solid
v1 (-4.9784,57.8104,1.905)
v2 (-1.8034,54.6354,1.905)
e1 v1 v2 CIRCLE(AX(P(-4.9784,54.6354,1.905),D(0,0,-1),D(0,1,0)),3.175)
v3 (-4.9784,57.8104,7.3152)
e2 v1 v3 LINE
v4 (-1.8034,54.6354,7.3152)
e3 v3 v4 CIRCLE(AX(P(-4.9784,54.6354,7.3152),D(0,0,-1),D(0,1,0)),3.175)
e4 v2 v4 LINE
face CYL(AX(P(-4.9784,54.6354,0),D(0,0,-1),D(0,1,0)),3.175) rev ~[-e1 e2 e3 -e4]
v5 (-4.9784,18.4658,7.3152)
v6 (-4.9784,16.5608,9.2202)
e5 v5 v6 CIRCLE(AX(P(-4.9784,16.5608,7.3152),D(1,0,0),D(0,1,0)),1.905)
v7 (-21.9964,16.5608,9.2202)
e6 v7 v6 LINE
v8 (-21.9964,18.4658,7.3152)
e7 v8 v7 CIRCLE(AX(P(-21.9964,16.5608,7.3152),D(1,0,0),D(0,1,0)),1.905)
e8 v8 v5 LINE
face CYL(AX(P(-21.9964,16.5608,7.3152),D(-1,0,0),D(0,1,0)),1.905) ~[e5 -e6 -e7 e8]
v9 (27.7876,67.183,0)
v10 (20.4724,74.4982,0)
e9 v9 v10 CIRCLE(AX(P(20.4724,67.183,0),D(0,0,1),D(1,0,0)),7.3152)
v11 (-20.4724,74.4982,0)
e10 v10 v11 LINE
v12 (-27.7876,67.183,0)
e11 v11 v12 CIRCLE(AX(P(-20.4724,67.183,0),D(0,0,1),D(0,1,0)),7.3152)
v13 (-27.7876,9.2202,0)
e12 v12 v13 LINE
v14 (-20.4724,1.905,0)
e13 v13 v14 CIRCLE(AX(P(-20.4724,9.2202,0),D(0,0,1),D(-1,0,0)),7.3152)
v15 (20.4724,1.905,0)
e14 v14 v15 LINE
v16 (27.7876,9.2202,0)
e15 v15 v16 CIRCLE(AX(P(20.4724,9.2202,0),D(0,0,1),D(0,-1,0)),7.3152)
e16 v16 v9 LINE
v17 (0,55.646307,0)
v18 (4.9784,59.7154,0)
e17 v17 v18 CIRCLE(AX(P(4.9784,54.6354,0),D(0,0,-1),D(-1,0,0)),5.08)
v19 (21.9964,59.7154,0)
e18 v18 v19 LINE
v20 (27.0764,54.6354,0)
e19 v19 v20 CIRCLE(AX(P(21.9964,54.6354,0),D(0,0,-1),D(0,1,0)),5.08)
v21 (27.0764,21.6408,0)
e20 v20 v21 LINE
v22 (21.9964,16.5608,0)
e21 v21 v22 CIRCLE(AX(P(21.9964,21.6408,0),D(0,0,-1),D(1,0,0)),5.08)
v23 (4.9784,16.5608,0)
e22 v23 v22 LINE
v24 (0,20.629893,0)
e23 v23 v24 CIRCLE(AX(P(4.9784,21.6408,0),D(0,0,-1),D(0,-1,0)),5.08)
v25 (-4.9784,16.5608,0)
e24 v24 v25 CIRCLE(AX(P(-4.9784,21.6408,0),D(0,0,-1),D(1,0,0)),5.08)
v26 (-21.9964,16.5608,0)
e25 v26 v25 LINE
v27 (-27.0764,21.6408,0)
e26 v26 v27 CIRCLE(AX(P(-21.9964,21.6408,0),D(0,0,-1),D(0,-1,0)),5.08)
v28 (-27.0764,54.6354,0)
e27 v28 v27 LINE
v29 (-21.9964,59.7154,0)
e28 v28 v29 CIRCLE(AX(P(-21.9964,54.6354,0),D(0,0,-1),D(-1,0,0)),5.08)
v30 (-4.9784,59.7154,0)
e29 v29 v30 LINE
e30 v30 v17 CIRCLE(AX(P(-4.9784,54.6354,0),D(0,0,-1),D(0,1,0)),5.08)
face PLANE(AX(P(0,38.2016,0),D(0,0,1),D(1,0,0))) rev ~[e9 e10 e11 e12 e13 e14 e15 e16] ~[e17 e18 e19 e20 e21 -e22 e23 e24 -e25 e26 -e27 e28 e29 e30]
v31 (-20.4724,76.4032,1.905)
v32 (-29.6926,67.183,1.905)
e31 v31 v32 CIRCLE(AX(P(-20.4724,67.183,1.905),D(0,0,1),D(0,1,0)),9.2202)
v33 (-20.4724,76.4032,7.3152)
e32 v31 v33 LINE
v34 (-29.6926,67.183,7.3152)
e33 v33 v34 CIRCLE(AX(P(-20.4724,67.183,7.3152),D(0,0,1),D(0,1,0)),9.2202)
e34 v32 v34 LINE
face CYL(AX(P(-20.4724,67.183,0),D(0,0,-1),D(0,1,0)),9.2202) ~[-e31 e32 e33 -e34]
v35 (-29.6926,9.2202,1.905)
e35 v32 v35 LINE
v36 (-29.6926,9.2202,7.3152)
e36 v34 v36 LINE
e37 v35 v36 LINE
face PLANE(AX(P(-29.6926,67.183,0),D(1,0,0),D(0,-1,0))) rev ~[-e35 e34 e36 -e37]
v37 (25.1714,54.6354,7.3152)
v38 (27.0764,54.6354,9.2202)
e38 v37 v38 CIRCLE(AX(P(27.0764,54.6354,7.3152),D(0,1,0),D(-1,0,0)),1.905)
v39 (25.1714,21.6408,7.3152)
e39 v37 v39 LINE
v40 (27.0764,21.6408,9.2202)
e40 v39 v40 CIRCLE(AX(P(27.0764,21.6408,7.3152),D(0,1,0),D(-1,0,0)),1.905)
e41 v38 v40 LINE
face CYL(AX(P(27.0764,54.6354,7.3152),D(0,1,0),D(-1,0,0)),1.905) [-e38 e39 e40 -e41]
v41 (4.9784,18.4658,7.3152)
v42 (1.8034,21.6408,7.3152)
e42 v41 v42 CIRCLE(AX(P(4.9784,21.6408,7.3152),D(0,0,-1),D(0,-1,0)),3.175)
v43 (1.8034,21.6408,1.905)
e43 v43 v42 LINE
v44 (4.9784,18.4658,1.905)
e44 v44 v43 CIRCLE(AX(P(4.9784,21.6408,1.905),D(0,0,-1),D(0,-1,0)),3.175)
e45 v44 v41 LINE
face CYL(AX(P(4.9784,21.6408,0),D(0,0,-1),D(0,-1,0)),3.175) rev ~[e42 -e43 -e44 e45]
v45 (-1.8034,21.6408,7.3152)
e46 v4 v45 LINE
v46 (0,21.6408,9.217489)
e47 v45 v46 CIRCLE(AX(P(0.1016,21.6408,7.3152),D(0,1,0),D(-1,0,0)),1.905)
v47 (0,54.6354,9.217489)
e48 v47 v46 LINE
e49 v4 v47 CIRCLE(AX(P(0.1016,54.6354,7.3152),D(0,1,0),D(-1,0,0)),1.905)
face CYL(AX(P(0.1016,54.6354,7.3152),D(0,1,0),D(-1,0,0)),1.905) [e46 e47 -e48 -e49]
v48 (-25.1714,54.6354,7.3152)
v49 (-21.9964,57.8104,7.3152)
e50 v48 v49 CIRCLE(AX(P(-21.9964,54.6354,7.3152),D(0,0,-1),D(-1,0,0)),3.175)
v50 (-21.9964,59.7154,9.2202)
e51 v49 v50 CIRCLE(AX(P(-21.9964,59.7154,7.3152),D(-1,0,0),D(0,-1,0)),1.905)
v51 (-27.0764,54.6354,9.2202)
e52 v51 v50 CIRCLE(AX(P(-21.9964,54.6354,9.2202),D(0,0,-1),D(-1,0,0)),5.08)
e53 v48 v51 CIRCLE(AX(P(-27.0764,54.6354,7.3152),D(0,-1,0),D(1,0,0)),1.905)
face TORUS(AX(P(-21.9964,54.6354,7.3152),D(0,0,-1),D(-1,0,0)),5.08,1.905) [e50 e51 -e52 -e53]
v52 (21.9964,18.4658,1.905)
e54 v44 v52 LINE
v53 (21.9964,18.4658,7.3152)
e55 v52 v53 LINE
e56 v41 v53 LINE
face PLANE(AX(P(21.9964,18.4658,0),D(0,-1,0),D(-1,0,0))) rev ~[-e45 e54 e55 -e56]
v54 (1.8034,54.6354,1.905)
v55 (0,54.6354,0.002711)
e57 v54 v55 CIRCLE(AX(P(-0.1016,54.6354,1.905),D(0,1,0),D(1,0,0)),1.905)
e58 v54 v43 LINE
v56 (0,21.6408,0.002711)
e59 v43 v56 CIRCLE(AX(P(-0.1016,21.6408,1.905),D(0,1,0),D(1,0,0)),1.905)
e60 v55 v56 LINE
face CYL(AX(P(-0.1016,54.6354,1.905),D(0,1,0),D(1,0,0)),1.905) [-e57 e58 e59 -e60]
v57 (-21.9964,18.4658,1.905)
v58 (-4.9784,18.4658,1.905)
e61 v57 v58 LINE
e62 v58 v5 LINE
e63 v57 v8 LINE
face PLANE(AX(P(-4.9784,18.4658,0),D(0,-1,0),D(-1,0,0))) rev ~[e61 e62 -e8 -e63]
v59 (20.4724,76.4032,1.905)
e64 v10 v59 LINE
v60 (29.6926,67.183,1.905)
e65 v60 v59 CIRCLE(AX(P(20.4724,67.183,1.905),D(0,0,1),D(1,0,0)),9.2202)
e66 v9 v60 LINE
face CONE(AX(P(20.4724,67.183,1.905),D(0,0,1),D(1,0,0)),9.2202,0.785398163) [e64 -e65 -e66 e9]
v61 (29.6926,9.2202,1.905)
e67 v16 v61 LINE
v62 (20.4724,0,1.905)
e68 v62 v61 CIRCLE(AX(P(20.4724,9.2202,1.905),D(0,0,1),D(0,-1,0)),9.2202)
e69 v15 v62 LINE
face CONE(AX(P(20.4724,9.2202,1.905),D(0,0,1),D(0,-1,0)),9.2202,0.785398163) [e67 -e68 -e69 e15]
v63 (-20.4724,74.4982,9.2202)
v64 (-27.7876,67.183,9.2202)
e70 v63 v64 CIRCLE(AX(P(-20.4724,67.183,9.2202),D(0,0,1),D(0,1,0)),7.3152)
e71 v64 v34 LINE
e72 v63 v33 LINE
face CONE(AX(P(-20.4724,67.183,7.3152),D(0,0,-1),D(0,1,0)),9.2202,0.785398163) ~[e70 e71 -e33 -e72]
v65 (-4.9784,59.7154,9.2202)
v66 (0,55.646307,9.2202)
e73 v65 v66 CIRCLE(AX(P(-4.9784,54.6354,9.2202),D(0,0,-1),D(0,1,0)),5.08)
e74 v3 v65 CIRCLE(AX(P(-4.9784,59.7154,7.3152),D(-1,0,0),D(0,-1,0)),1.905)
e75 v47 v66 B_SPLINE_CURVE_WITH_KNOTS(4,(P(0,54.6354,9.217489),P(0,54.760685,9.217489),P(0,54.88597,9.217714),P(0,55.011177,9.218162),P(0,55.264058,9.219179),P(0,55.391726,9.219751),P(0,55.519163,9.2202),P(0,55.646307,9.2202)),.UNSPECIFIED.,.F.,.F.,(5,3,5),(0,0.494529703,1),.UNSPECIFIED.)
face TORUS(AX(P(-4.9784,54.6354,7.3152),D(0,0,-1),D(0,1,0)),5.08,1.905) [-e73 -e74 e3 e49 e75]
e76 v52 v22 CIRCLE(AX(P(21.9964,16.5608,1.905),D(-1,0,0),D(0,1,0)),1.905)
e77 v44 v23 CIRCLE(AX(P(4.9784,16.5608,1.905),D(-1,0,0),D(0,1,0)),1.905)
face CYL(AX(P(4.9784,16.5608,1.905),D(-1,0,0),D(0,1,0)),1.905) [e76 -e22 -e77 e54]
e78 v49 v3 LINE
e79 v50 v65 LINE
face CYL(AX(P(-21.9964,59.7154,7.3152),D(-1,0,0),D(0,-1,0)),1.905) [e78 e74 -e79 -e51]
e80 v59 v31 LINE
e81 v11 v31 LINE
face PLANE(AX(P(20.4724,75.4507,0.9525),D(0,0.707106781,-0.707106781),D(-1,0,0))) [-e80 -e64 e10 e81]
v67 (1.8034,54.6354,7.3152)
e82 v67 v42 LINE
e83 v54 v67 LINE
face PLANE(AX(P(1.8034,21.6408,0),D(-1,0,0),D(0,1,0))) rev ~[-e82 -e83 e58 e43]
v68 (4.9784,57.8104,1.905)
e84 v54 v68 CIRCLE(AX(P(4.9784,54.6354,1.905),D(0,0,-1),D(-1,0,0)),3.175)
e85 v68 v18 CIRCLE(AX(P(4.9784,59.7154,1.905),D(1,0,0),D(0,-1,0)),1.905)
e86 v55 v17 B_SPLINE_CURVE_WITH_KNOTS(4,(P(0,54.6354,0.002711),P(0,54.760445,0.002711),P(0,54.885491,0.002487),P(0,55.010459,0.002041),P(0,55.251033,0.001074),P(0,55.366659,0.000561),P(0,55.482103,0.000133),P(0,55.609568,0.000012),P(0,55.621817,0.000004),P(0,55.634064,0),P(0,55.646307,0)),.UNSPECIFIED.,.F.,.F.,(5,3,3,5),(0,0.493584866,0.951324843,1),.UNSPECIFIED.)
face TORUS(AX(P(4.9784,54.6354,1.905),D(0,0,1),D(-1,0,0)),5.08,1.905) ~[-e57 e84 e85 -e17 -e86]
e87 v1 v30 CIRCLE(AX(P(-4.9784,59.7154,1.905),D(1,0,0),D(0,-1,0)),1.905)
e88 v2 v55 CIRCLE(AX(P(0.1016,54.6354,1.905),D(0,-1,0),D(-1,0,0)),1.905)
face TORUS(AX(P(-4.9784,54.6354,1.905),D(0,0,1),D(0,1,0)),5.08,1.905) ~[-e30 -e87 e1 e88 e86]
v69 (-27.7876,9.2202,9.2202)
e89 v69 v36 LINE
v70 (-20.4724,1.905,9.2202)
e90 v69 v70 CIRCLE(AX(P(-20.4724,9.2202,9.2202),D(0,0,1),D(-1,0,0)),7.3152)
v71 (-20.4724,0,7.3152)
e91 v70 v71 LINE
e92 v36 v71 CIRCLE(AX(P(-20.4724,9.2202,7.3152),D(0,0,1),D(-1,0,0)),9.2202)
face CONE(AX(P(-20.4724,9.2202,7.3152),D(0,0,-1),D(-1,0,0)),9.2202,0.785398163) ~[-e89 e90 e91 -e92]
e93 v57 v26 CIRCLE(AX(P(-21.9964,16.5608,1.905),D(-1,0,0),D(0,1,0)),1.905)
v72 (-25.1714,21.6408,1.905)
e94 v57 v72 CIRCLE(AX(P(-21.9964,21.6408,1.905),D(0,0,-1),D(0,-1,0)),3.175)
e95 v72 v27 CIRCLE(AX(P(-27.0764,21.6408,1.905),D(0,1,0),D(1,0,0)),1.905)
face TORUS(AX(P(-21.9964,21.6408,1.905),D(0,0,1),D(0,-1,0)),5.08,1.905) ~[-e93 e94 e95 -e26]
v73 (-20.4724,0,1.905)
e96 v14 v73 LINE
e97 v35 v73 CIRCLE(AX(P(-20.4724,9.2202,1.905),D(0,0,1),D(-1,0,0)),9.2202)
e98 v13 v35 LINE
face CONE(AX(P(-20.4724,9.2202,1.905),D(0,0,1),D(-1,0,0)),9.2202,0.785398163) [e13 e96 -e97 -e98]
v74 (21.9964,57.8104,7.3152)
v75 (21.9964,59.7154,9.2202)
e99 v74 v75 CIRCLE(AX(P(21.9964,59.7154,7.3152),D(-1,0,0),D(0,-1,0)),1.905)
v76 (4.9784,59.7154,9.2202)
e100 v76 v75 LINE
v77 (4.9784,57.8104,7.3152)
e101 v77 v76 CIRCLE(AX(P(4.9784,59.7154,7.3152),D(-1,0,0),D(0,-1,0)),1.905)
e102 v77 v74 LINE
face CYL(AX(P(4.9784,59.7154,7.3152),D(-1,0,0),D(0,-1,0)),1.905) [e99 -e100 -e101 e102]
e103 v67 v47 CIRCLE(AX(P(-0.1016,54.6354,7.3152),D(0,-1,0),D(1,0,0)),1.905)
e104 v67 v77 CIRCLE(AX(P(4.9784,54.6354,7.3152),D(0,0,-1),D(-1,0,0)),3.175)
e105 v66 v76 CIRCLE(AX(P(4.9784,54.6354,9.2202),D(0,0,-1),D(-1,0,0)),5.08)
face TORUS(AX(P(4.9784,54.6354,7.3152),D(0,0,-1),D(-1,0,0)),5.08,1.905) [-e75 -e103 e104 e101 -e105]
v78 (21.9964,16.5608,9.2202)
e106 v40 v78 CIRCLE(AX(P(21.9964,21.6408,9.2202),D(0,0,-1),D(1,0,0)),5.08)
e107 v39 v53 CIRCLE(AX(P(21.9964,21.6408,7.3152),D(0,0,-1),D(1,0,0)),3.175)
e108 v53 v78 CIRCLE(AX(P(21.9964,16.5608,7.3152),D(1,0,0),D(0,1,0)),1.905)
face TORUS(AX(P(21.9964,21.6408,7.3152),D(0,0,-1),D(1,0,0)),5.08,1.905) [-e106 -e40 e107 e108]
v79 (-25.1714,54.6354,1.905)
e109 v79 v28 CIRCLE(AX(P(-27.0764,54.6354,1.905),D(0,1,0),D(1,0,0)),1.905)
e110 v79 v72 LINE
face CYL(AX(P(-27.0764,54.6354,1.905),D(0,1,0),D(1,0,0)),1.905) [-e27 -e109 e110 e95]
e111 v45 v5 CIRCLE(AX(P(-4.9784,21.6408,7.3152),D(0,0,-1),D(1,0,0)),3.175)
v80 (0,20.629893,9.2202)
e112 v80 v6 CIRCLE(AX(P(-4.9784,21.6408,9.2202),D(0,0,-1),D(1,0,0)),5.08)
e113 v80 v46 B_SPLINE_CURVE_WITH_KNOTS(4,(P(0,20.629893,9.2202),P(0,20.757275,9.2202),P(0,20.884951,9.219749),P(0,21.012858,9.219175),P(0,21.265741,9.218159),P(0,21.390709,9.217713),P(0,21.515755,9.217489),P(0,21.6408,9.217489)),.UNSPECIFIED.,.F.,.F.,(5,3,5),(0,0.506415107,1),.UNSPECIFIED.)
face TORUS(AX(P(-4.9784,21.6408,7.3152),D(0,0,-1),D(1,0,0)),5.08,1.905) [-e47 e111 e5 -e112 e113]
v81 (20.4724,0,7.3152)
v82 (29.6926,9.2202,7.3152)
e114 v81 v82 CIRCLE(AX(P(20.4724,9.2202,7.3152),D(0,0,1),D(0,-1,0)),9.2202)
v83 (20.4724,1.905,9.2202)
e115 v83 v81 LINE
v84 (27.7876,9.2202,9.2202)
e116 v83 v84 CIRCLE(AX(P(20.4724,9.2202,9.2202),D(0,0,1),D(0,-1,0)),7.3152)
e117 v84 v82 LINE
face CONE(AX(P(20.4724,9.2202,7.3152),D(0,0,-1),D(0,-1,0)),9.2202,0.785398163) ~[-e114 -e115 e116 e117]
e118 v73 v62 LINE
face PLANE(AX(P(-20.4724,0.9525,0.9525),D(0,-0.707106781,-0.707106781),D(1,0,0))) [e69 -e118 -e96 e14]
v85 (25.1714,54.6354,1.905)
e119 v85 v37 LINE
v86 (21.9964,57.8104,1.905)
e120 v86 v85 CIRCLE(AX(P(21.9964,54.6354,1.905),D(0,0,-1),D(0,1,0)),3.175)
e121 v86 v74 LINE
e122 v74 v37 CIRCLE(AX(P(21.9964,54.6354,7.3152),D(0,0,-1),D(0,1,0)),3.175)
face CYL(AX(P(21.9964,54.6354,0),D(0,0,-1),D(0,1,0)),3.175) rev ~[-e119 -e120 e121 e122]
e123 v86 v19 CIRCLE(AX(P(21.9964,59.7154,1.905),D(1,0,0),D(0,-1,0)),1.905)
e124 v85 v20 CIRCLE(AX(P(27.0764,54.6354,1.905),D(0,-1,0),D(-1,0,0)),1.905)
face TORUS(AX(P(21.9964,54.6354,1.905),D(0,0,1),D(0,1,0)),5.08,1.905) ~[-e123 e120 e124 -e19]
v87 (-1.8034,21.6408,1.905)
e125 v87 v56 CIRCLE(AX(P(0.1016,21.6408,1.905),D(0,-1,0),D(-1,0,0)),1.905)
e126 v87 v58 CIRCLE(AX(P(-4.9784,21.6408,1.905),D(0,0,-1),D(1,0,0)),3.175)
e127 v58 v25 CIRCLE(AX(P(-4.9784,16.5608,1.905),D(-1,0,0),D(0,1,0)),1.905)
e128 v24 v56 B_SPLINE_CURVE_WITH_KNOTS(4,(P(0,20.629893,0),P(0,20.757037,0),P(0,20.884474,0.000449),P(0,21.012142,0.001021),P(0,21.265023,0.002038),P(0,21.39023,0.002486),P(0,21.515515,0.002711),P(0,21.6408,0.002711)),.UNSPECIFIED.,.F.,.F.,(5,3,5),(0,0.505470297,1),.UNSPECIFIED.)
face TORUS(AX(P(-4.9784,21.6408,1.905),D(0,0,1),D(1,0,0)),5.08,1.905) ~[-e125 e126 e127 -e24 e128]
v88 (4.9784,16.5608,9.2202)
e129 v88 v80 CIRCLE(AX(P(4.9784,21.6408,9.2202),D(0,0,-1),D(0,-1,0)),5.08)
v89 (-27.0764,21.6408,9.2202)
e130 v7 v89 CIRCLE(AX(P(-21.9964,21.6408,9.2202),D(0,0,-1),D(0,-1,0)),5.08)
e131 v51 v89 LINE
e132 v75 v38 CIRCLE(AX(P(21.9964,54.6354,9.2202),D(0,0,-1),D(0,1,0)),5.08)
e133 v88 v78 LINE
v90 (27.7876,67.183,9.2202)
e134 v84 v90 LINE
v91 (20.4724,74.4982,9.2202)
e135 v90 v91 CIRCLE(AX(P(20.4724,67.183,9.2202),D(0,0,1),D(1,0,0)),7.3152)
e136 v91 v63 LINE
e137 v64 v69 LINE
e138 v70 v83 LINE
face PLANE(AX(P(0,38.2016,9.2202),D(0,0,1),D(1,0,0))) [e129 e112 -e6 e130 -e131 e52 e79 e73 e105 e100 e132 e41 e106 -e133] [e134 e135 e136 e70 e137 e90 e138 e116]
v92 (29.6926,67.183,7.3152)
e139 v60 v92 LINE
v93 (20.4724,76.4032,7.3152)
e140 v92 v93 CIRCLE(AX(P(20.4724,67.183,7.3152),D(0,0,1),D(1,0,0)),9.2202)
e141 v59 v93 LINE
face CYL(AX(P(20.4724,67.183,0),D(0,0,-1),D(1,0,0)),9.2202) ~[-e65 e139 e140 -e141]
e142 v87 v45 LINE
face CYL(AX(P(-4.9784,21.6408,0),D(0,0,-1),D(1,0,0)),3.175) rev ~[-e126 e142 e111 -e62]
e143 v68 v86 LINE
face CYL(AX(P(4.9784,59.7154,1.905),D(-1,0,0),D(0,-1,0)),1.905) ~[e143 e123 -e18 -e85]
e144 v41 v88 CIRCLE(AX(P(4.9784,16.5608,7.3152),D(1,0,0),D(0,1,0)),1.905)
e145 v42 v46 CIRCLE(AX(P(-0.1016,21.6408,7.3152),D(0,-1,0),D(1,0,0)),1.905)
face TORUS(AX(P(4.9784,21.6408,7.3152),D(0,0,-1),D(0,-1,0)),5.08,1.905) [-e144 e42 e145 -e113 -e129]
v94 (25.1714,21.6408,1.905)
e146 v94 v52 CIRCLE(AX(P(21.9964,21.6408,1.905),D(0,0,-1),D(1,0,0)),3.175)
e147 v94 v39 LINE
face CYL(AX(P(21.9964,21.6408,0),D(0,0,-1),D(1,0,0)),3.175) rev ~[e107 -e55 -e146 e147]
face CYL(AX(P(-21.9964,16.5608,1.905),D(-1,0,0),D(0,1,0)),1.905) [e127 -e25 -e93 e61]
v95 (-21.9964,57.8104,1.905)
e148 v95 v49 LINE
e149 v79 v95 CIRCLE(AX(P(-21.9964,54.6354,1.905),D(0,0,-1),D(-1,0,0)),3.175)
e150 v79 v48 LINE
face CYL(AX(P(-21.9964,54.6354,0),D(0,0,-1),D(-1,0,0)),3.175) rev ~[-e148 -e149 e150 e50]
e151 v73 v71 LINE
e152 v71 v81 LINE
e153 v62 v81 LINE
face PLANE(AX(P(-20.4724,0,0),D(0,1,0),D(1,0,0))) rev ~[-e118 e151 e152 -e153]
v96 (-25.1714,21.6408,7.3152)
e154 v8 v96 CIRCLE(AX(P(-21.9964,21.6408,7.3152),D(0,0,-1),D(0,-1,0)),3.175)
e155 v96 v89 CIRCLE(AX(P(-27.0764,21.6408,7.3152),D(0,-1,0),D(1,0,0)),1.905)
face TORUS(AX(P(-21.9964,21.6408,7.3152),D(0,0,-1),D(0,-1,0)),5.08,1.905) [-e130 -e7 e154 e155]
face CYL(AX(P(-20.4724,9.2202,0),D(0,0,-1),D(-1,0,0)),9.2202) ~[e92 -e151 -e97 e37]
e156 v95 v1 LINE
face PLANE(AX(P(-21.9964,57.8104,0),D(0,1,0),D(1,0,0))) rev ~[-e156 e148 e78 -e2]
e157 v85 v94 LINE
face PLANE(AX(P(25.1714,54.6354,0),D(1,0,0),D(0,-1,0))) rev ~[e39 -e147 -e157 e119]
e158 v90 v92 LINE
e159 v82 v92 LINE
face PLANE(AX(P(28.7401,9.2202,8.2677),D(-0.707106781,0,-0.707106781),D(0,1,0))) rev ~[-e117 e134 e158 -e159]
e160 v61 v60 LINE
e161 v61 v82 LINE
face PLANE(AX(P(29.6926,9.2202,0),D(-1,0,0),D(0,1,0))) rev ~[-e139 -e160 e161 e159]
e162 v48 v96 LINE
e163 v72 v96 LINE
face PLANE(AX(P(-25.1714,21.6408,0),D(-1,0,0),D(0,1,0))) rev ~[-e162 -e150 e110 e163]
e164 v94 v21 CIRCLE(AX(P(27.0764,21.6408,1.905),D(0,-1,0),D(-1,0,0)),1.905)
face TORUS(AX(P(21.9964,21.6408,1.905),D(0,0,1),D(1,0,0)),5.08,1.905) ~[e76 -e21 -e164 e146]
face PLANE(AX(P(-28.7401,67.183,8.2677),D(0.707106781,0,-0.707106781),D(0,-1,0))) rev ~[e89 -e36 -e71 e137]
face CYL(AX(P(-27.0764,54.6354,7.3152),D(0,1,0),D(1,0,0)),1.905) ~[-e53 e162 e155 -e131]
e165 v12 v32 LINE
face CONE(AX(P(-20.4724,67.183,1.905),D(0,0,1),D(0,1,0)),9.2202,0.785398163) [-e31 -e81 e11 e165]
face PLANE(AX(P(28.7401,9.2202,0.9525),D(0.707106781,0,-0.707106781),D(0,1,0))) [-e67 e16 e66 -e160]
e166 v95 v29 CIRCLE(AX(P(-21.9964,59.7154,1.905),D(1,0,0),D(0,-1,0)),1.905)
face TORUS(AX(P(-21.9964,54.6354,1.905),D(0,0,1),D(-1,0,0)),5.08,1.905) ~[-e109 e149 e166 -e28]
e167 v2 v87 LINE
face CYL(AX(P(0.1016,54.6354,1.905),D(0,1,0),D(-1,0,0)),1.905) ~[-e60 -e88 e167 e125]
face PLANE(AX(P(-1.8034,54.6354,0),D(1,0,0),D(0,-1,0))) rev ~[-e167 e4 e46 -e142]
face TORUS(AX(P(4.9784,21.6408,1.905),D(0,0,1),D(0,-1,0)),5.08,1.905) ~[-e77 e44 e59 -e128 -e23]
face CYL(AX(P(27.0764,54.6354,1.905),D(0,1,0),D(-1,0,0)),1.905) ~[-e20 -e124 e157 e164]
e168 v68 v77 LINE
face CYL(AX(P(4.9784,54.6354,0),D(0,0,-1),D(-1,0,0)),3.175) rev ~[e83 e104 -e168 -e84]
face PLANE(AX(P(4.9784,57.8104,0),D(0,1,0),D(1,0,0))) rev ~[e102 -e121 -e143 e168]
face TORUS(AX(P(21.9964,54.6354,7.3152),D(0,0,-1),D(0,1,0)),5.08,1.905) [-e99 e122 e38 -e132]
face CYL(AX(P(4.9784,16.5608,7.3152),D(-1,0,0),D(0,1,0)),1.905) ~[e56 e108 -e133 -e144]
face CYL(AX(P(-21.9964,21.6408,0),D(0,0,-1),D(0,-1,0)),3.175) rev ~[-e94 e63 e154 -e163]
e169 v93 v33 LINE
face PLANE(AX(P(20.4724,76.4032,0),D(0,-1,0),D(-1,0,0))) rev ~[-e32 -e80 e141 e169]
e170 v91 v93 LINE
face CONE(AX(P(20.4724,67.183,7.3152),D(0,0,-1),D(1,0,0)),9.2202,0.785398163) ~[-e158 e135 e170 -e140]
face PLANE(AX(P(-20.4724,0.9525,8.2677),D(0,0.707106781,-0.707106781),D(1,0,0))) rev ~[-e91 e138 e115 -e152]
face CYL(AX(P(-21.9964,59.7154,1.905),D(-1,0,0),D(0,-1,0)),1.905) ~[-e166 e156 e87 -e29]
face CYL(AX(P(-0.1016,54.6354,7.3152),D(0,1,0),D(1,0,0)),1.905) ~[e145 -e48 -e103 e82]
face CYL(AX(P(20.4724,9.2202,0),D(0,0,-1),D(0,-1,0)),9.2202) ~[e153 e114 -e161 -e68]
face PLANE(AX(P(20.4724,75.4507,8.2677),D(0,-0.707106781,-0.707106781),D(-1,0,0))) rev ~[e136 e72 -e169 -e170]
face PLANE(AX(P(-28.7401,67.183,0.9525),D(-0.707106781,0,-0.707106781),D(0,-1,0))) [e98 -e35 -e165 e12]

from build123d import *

# Parameters (mm, degrees)
F1_DEPTH     = 9.2202
F2_T1_DEPTH  = 32.9946
F2_T3_DEPTH  = 17.018
F2_T5_DEPTH  = 17.018
F2_T8_ANGLE  = 90
F2_T10_ANGLE = 90
F2_T12_ANGLE = 90
F2_T14_ANGLE = 90
F2_T16_ANGLE = 90
F2_T18_ANGLE = 90
F2_T20_ANGLE = 90
F2_T22_ANGLE = 90
F2_T24_ANGLE = 90
F2_T26_ANGLE = 90
F2_T28_ANGLE = 90
F2_T30_ANGLE = 90
F2_T32_ANGLE = 90
F2_T34_ANGLE = 90
F2_T36_ANGLE = 90
F2_T38_ANGLE = 90
F3_SIZE      = 1.905


# Not quite as in the source:
# - a fillet or chamfer that OpenCascade refuses, or shapes differently, is made with other operations: its cross-section is extruded or revolved along the edge and cut away or added


with BuildPart() as f1:
    # F0 (on Top) → F1 (new body)
    with BuildSketch(Plane.XY):
        with BuildLine():
            Line((20.4724, 76.4032), (-20.4724, 76.4032))
            ThreePointArc((-20.4724, 76.4032), (-26.9920659439, 73.7026659439), (-29.6926, 67.183))
            Line((-29.6926, 67.183), (-29.6926, 9.2202))
            ThreePointArc((-29.6926, 9.2202), (-26.9920659439, 2.7005340561), (-20.4724, 0))
            Line((-20.4724, 0), (20.4724, 0))
            ThreePointArc((20.4724, 0), (26.9920659439, 2.7005340561), (29.6926, 9.2202))
            Line((29.6926, 9.2202), (29.6926, 67.183))
            ThreePointArc((29.6926, 67.183), (26.9920659439, 73.7026659439), (20.4724, 76.4032))
        make_face()
        with BuildLine():
            Line((-25.1714, 21.6408), (-25.1714, 54.6354))
            ThreePointArc((-25.1714, 54.6354), (-24.2414640303, 56.8804640303), (-21.9964, 57.8104))
            Line((-21.9964, 57.8104), (-4.9784, 57.8104))
            ThreePointArc((-4.9784, 57.8104), (-2.7333359697, 56.8804640303), (-1.8034, 54.6354))
            Line((-1.8034, 54.6354), (-1.8034, 21.6408))
            ThreePointArc((-1.8034, 21.6408), (-2.7333359697, 19.3957359697), (-4.9784, 18.4658))
            Line((-4.9784, 18.4658), (-21.9964, 18.4658))
            ThreePointArc((-21.9964, 18.4658), (-24.2414640303, 19.3957359697), (-25.1714, 21.6408))
        make_face(mode=Mode.SUBTRACT)
        with BuildLine():
            Line((1.8034, 21.6408), (1.8034, 54.6354))
            ThreePointArc((1.8034, 54.6354), (2.7333359697, 56.8804640303), (4.9784, 57.8104))
            Line((4.9784, 57.8104), (21.9964, 57.8104))
            ThreePointArc((21.9964, 57.8104), (24.2414640303, 56.8804640303), (25.1714, 54.6354))
            Line((25.1714, 54.6354), (25.1714, 21.6408))
            ThreePointArc((25.1714, 21.6408), (24.2414640303, 19.3957359697), (21.9964, 18.4658))
            Line((21.9964, 18.4658), (4.9784, 18.4658))
            ThreePointArc((4.9784, 18.4658), (2.7333359697, 19.3957359697), (1.8034, 21.6408))
        make_face(mode=Mode.SUBTRACT)
    extrude(amount=F1_DEPTH)

    # F2: fillet of radius 1.905 on 4 edges, made by hand

    # F2_s2 → F2_t1 (cut)
    with BuildSketch(Plane.XZ.offset(-54.6354)):
        with BuildLine():
            ThreePointArc((25.1714, 1.905), (25.7293615818, 0.5579615818), (27.0764, 0))
            Line((27.0764, 0), (25.1714, 0))
            Line((25.1714, 0), (25.1714, 1.905))
        make_face()
        with BuildLine():
            ThreePointArc((-25.1714, 1.905), (-25.7293615818, 0.5579615818), (-27.0764, 0))
            Line((-27.0764, 0), (-25.1714, 0))
            Line((-25.1714, 0), (-25.1714, 1.905))
        make_face()
        with BuildLine():
            ThreePointArc((-1.8034, 7.3152), (-1.2454384182, 8.6622384182), (0.1016, 9.2202))
            Line((0.1016, 9.2202), (-1.8034, 9.2202))
            Line((-1.8034, 9.2202), (-1.8034, 7.3152))
        make_face()
        with BuildLine():
            ThreePointArc((25.1714, 7.3152), (25.7293615818, 8.6622384182), (27.0764, 9.2202))
            Line((27.0764, 9.2202), (25.1714, 9.2202))
            Line((25.1714, 9.2202), (25.1714, 7.3152))
        make_face()
        with BuildLine():
            ThreePointArc((1.8034, 7.3152), (1.2454384182, 8.6622384182), (-0.1016, 9.2202))
            Line((-0.1016, 9.2202), (1.8034, 9.2202))
            Line((1.8034, 9.2202), (1.8034, 7.3152))
        make_face()
        with BuildLine():
            ThreePointArc((-25.1714, 7.3152), (-25.7293615818, 8.6622384182), (-27.0764, 9.2202))
            Line((-27.0764, 9.2202), (-25.1714, 9.2202))
            Line((-25.1714, 9.2202), (-25.1714, 7.3152))
        make_face()
        with BuildLine():
            ThreePointArc((-1.8034, 1.905), (-1.2454384182, 0.5579615818), (0.1016, 0))
            Line((0.1016, 0), (-1.8034, 0))
            Line((-1.8034, 0), (-1.8034, 1.905))
        make_face()
        with BuildLine():
            ThreePointArc((1.8034, 1.905), (1.2454384182, 0.5579615818), (-0.1016, 0))
            Line((-0.1016, 0), (1.8034, 0))
            Line((1.8034, 0), (1.8034, 1.905))
        make_face()
    extrude(amount=F2_T1_DEPTH, mode=Mode.SUBTRACT)

    # F2_s4 → F2_t3 (cut)
    with BuildSketch(Plane.YZ.offset(4.9784)):
        with BuildLine():
            ThreePointArc((57.8104, 7.3152), (58.3683615818, 8.6622384182), (59.7154, 9.2202))
            Line((59.7154, 9.2202), (57.8104, 9.2202))
            Line((57.8104, 9.2202), (57.8104, 7.3152))
        make_face()
        with BuildLine():
            ThreePointArc((18.4658, 7.3152), (17.9078384182, 8.6622384182), (16.5608, 9.2202))
            Line((16.5608, 9.2202), (18.4658, 9.2202))
            Line((18.4658, 9.2202), (18.4658, 7.3152))
        make_face()
        with BuildLine():
            ThreePointArc((18.4658, 1.905), (17.9078384182, 0.5579615818), (16.5608, 0))
            Line((16.5608, 0), (18.4658, 0))
            Line((18.4658, 0), (18.4658, 1.905))
        make_face()
        with BuildLine():
            ThreePointArc((57.8104, 1.905), (58.3683615818, 0.5579615818), (59.7154, 0))
            Line((59.7154, 0), (57.8104, 0))
            Line((57.8104, 0), (57.8104, 1.905))
        make_face()
    extrude(amount=F2_T3_DEPTH, mode=Mode.SUBTRACT)

    # F2_s6 → F2_t5 (cut)
    with BuildSketch(Plane.YZ.offset(-21.9964)):
        with BuildLine():
            ThreePointArc((18.4658, 7.3152), (17.9078384182, 8.6622384182), (16.5608, 9.2202))
            Line((16.5608, 9.2202), (18.4658, 9.2202))
            Line((18.4658, 9.2202), (18.4658, 7.3152))
        make_face()
        with BuildLine():
            ThreePointArc((57.8104, 7.3152), (58.3683615818, 8.6622384182), (59.7154, 9.2202))
            Line((59.7154, 9.2202), (57.8104, 9.2202))
            Line((57.8104, 9.2202), (57.8104, 7.3152))
        make_face()
        with BuildLine():
            ThreePointArc((57.8104, 1.905), (58.3683615818, 0.5579615818), (59.7154, 0))
            Line((59.7154, 0), (57.8104, 0))
            Line((57.8104, 0), (57.8104, 1.905))
        make_face()
        with BuildLine():
            ThreePointArc((18.4658, 1.905), (17.9078384182, 0.5579615818), (16.5608, 0))
            Line((16.5608, 0), (18.4658, 0))
            Line((18.4658, 0), (18.4658, 1.905))
        make_face()
    extrude(amount=F2_T5_DEPTH, mode=Mode.SUBTRACT)

    # F2_s7 → F2_t8 (revolve, cut)
    with BuildSketch(Plane.XZ.offset(-54.6354)):
        with BuildLine():
            ThreePointArc((1.8034, 7.3152), (1.2454384182, 8.6622384182), (-0.1016, 9.2202))
            Line((-0.1016, 9.2202), (1.8034, 9.2202))
            Line((1.8034, 9.2202), (1.8034, 7.3152))
        make_face()
    revolve(axis=Axis((4.9784, 54.6354, 9.2202), (0, 0, -1)), revolution_arc=F2_T8_ANGLE, mode=Mode.SUBTRACT)

    # F2_s9 → F2_t10 (revolve, cut)
    with BuildSketch(Plane.YZ.offset(21.9964)):
        with BuildLine():
            ThreePointArc((57.8104, 7.3152), (58.3683615818, 8.6622384182), (59.7154, 9.2202))
            Line((59.7154, 9.2202), (57.8104, 9.2202))
            Line((57.8104, 9.2202), (57.8104, 7.3152))
        make_face()
    revolve(axis=Axis((21.9964, 54.6354, 9.2202), (0, 0, -1)), revolution_arc=F2_T10_ANGLE, mode=Mode.SUBTRACT)

    # F2_s11 → F2_t12 (revolve, cut)
    with BuildSketch(Plane.XZ.offset(-21.6408)):
        with BuildLine():
            ThreePointArc((25.1714, 7.3152), (25.7293615818, 8.6622384182), (27.0764, 9.2202))
            Line((27.0764, 9.2202), (25.1714, 9.2202))
            Line((25.1714, 9.2202), (25.1714, 7.3152))
        make_face()
    revolve(axis=Axis((21.9964, 21.6408, 9.2202), (0, 0, -1)), revolution_arc=F2_T12_ANGLE, mode=Mode.SUBTRACT)

    # F2_s13 → F2_t14 (revolve, cut)
    with BuildSketch(Plane.YZ.offset(4.9784)):
        with BuildLine():
            ThreePointArc((18.4658, 7.3152), (17.9078384182, 8.6622384182), (16.5608, 9.2202))
            Line((16.5608, 9.2202), (18.4658, 9.2202))
            Line((18.4658, 9.2202), (18.4658, 7.3152))
        make_face()
    revolve(axis=Axis((4.9784, 21.6408, 9.2202), (0, 0, -1)), revolution_arc=F2_T14_ANGLE, mode=Mode.SUBTRACT)

    # F2_s15 → F2_t16 (revolve, cut)
    with BuildSketch(Plane.YZ.offset(-4.9784)):
        with BuildLine():
            ThreePointArc((57.8104, 7.3152), (58.3683615818, 8.6622384182), (59.7154, 9.2202))
            Line((59.7154, 9.2202), (57.8104, 9.2202))
            Line((57.8104, 9.2202), (57.8104, 7.3152))
        make_face()
    revolve(axis=Axis((-4.9784, 54.6354, 9.2202), (0, 0, -1)), revolution_arc=F2_T16_ANGLE, mode=Mode.SUBTRACT)

    # F2_s17 → F2_t18 (revolve, cut)
    with BuildSketch(Plane.XZ.offset(-21.6408)):
        with BuildLine():
            ThreePointArc((-1.8034, 7.3152), (-1.2454384182, 8.6622384182), (0.1016, 9.2202))
            Line((0.1016, 9.2202), (-1.8034, 9.2202))
            Line((-1.8034, 9.2202), (-1.8034, 7.3152))
        make_face()
    revolve(axis=Axis((-4.9784, 21.6408, 9.2202), (0, 0, -1)), revolution_arc=F2_T18_ANGLE, mode=Mode.SUBTRACT)

    # F2_s19 → F2_t20 (revolve, cut)
    with BuildSketch(Plane.YZ.offset(-21.9964)):
        with BuildLine():
            ThreePointArc((18.4658, 7.3152), (17.9078384182, 8.6622384182), (16.5608, 9.2202))
            Line((16.5608, 9.2202), (18.4658, 9.2202))
            Line((18.4658, 9.2202), (18.4658, 7.3152))
        make_face()
    revolve(axis=Axis((-21.9964, 21.6408, 9.2202), (0, 0, -1)), revolution_arc=F2_T20_ANGLE, mode=Mode.SUBTRACT)

    # F2_s21 → F2_t22 (revolve, cut)
    with BuildSketch(Plane.XZ.offset(-54.6354)):
        with BuildLine():
            ThreePointArc((-25.1714, 7.3152), (-25.7293615818, 8.6622384182), (-27.0764, 9.2202))
            Line((-27.0764, 9.2202), (-25.1714, 9.2202))
            Line((-25.1714, 9.2202), (-25.1714, 7.3152))
        make_face()
    revolve(axis=Axis((-21.9964, 54.6354, 9.2202), (0, 0, -1)), revolution_arc=F2_T22_ANGLE, mode=Mode.SUBTRACT)

    # F2_s23 → F2_t24 (revolve, cut)
    with BuildSketch(Plane.YZ.offset(-21.9964)):
        with BuildLine():
            ThreePointArc((18.4658, 1.905), (17.9078384182, 0.5579615818), (16.5608, 0))
            Line((16.5608, 0), (18.4658, 0))
            Line((18.4658, 0), (18.4658, 1.905))
        make_face()
    revolve(axis=Axis((-21.9964, 21.6408, 0), (0, 0, -1)), revolution_arc=F2_T24_ANGLE, mode=Mode.SUBTRACT)

    # F2_s25 → F2_t26 (revolve, cut)
    with BuildSketch(Plane.XZ.offset(-54.6354)):
        with BuildLine():
            ThreePointArc((-25.1714, 1.905), (-25.7293615818, 0.5579615818), (-27.0764, 0))
            Line((-27.0764, 0), (-25.1714, 0))
            Line((-25.1714, 0), (-25.1714, 1.905))
        make_face()
    revolve(axis=Axis((-21.9964, 54.6354, 0), (0, 0, -1)), revolution_arc=F2_T26_ANGLE, mode=Mode.SUBTRACT)

    # F2_s27 → F2_t28 (revolve, cut)
    with BuildSketch(Plane.YZ.offset(-4.9784)):
        with BuildLine():
            ThreePointArc((57.8104, 1.905), (58.3683615818, 0.5579615818), (59.7154, 0))
            Line((59.7154, 0), (57.8104, 0))
            Line((57.8104, 0), (57.8104, 1.905))
        make_face()
    revolve(axis=Axis((-4.9784, 54.6354, 0), (0, 0, -1)), revolution_arc=F2_T28_ANGLE, mode=Mode.SUBTRACT)

    # F2_s29 → F2_t30 (revolve, cut)
    with BuildSketch(Plane.XZ.offset(-21.6408)):
        with BuildLine():
            ThreePointArc((-1.8034, 1.905), (-1.2454384182, 0.5579615818), (0.1016, 0))
            Line((0.1016, 0), (-1.8034, 0))
            Line((-1.8034, 0), (-1.8034, 1.905))
        make_face()
    revolve(axis=Axis((-4.9784, 21.6408, 0), (0, 0, -1)), revolution_arc=F2_T30_ANGLE, mode=Mode.SUBTRACT)

    # F2_s31 → F2_t32 (revolve, cut)
    with BuildSketch(Plane.YZ.offset(21.9964)):
        with BuildLine():
            ThreePointArc((57.8104, 1.905), (58.3683615818, 0.5579615818), (59.7154, 0))
            Line((59.7154, 0), (57.8104, 0))
            Line((57.8104, 0), (57.8104, 1.905))
        make_face()
    revolve(axis=Axis((21.9964, 54.6354, 0), (0, 0, -1)), revolution_arc=F2_T32_ANGLE, mode=Mode.SUBTRACT)

    # F2_s33 → F2_t34 (revolve, cut)
    with BuildSketch(Plane.XZ.offset(-21.6408)):
        with BuildLine():
            ThreePointArc((25.1714, 1.905), (25.7293615818, 0.5579615818), (27.0764, 0))
            Line((27.0764, 0), (25.1714, 0))
            Line((25.1714, 0), (25.1714, 1.905))
        make_face()
    revolve(axis=Axis((21.9964, 21.6408, 0), (0, 0, -1)), revolution_arc=F2_T34_ANGLE, mode=Mode.SUBTRACT)

    # F2_s35 → F2_t36 (revolve, cut)
    with BuildSketch(Plane.YZ.offset(4.9784)):
        with BuildLine():
            ThreePointArc((18.4658, 1.905), (17.9078384182, 0.5579615818), (16.5608, 0))
            Line((16.5608, 0), (18.4658, 0))
            Line((18.4658, 0), (18.4658, 1.905))
        make_face()
    revolve(axis=Axis((4.9784, 21.6408, 0), (0, 0, -1)), revolution_arc=F2_T36_ANGLE, mode=Mode.SUBTRACT)

    # F2_s37 → F2_t38 (revolve, cut)
    with BuildSketch(Plane.XZ.offset(-54.6354)):
        with BuildLine():
            ThreePointArc((1.8034, 1.905), (1.2454384182, 0.5579615818), (-0.1016, 0))
            Line((-0.1016, 0), (1.8034, 0))
            Line((1.8034, 0), (1.8034, 1.905))
        make_face()
    revolve(axis=Axis((4.9784, 54.6354, 0), (0, 0, -1)), revolution_arc=F2_T38_ANGLE, mode=Mode.SUBTRACT)

    # F3
    f3_edges = [f1.edges().sort_by_distance(p)[0] for p in [
        (-29.6926, 38.2016, 9.2202),
        (-29.6926, 38.2016, 0),
    ]]
    chamfer(f3_edges, length=F3_SIZE)


solid = f1.part
